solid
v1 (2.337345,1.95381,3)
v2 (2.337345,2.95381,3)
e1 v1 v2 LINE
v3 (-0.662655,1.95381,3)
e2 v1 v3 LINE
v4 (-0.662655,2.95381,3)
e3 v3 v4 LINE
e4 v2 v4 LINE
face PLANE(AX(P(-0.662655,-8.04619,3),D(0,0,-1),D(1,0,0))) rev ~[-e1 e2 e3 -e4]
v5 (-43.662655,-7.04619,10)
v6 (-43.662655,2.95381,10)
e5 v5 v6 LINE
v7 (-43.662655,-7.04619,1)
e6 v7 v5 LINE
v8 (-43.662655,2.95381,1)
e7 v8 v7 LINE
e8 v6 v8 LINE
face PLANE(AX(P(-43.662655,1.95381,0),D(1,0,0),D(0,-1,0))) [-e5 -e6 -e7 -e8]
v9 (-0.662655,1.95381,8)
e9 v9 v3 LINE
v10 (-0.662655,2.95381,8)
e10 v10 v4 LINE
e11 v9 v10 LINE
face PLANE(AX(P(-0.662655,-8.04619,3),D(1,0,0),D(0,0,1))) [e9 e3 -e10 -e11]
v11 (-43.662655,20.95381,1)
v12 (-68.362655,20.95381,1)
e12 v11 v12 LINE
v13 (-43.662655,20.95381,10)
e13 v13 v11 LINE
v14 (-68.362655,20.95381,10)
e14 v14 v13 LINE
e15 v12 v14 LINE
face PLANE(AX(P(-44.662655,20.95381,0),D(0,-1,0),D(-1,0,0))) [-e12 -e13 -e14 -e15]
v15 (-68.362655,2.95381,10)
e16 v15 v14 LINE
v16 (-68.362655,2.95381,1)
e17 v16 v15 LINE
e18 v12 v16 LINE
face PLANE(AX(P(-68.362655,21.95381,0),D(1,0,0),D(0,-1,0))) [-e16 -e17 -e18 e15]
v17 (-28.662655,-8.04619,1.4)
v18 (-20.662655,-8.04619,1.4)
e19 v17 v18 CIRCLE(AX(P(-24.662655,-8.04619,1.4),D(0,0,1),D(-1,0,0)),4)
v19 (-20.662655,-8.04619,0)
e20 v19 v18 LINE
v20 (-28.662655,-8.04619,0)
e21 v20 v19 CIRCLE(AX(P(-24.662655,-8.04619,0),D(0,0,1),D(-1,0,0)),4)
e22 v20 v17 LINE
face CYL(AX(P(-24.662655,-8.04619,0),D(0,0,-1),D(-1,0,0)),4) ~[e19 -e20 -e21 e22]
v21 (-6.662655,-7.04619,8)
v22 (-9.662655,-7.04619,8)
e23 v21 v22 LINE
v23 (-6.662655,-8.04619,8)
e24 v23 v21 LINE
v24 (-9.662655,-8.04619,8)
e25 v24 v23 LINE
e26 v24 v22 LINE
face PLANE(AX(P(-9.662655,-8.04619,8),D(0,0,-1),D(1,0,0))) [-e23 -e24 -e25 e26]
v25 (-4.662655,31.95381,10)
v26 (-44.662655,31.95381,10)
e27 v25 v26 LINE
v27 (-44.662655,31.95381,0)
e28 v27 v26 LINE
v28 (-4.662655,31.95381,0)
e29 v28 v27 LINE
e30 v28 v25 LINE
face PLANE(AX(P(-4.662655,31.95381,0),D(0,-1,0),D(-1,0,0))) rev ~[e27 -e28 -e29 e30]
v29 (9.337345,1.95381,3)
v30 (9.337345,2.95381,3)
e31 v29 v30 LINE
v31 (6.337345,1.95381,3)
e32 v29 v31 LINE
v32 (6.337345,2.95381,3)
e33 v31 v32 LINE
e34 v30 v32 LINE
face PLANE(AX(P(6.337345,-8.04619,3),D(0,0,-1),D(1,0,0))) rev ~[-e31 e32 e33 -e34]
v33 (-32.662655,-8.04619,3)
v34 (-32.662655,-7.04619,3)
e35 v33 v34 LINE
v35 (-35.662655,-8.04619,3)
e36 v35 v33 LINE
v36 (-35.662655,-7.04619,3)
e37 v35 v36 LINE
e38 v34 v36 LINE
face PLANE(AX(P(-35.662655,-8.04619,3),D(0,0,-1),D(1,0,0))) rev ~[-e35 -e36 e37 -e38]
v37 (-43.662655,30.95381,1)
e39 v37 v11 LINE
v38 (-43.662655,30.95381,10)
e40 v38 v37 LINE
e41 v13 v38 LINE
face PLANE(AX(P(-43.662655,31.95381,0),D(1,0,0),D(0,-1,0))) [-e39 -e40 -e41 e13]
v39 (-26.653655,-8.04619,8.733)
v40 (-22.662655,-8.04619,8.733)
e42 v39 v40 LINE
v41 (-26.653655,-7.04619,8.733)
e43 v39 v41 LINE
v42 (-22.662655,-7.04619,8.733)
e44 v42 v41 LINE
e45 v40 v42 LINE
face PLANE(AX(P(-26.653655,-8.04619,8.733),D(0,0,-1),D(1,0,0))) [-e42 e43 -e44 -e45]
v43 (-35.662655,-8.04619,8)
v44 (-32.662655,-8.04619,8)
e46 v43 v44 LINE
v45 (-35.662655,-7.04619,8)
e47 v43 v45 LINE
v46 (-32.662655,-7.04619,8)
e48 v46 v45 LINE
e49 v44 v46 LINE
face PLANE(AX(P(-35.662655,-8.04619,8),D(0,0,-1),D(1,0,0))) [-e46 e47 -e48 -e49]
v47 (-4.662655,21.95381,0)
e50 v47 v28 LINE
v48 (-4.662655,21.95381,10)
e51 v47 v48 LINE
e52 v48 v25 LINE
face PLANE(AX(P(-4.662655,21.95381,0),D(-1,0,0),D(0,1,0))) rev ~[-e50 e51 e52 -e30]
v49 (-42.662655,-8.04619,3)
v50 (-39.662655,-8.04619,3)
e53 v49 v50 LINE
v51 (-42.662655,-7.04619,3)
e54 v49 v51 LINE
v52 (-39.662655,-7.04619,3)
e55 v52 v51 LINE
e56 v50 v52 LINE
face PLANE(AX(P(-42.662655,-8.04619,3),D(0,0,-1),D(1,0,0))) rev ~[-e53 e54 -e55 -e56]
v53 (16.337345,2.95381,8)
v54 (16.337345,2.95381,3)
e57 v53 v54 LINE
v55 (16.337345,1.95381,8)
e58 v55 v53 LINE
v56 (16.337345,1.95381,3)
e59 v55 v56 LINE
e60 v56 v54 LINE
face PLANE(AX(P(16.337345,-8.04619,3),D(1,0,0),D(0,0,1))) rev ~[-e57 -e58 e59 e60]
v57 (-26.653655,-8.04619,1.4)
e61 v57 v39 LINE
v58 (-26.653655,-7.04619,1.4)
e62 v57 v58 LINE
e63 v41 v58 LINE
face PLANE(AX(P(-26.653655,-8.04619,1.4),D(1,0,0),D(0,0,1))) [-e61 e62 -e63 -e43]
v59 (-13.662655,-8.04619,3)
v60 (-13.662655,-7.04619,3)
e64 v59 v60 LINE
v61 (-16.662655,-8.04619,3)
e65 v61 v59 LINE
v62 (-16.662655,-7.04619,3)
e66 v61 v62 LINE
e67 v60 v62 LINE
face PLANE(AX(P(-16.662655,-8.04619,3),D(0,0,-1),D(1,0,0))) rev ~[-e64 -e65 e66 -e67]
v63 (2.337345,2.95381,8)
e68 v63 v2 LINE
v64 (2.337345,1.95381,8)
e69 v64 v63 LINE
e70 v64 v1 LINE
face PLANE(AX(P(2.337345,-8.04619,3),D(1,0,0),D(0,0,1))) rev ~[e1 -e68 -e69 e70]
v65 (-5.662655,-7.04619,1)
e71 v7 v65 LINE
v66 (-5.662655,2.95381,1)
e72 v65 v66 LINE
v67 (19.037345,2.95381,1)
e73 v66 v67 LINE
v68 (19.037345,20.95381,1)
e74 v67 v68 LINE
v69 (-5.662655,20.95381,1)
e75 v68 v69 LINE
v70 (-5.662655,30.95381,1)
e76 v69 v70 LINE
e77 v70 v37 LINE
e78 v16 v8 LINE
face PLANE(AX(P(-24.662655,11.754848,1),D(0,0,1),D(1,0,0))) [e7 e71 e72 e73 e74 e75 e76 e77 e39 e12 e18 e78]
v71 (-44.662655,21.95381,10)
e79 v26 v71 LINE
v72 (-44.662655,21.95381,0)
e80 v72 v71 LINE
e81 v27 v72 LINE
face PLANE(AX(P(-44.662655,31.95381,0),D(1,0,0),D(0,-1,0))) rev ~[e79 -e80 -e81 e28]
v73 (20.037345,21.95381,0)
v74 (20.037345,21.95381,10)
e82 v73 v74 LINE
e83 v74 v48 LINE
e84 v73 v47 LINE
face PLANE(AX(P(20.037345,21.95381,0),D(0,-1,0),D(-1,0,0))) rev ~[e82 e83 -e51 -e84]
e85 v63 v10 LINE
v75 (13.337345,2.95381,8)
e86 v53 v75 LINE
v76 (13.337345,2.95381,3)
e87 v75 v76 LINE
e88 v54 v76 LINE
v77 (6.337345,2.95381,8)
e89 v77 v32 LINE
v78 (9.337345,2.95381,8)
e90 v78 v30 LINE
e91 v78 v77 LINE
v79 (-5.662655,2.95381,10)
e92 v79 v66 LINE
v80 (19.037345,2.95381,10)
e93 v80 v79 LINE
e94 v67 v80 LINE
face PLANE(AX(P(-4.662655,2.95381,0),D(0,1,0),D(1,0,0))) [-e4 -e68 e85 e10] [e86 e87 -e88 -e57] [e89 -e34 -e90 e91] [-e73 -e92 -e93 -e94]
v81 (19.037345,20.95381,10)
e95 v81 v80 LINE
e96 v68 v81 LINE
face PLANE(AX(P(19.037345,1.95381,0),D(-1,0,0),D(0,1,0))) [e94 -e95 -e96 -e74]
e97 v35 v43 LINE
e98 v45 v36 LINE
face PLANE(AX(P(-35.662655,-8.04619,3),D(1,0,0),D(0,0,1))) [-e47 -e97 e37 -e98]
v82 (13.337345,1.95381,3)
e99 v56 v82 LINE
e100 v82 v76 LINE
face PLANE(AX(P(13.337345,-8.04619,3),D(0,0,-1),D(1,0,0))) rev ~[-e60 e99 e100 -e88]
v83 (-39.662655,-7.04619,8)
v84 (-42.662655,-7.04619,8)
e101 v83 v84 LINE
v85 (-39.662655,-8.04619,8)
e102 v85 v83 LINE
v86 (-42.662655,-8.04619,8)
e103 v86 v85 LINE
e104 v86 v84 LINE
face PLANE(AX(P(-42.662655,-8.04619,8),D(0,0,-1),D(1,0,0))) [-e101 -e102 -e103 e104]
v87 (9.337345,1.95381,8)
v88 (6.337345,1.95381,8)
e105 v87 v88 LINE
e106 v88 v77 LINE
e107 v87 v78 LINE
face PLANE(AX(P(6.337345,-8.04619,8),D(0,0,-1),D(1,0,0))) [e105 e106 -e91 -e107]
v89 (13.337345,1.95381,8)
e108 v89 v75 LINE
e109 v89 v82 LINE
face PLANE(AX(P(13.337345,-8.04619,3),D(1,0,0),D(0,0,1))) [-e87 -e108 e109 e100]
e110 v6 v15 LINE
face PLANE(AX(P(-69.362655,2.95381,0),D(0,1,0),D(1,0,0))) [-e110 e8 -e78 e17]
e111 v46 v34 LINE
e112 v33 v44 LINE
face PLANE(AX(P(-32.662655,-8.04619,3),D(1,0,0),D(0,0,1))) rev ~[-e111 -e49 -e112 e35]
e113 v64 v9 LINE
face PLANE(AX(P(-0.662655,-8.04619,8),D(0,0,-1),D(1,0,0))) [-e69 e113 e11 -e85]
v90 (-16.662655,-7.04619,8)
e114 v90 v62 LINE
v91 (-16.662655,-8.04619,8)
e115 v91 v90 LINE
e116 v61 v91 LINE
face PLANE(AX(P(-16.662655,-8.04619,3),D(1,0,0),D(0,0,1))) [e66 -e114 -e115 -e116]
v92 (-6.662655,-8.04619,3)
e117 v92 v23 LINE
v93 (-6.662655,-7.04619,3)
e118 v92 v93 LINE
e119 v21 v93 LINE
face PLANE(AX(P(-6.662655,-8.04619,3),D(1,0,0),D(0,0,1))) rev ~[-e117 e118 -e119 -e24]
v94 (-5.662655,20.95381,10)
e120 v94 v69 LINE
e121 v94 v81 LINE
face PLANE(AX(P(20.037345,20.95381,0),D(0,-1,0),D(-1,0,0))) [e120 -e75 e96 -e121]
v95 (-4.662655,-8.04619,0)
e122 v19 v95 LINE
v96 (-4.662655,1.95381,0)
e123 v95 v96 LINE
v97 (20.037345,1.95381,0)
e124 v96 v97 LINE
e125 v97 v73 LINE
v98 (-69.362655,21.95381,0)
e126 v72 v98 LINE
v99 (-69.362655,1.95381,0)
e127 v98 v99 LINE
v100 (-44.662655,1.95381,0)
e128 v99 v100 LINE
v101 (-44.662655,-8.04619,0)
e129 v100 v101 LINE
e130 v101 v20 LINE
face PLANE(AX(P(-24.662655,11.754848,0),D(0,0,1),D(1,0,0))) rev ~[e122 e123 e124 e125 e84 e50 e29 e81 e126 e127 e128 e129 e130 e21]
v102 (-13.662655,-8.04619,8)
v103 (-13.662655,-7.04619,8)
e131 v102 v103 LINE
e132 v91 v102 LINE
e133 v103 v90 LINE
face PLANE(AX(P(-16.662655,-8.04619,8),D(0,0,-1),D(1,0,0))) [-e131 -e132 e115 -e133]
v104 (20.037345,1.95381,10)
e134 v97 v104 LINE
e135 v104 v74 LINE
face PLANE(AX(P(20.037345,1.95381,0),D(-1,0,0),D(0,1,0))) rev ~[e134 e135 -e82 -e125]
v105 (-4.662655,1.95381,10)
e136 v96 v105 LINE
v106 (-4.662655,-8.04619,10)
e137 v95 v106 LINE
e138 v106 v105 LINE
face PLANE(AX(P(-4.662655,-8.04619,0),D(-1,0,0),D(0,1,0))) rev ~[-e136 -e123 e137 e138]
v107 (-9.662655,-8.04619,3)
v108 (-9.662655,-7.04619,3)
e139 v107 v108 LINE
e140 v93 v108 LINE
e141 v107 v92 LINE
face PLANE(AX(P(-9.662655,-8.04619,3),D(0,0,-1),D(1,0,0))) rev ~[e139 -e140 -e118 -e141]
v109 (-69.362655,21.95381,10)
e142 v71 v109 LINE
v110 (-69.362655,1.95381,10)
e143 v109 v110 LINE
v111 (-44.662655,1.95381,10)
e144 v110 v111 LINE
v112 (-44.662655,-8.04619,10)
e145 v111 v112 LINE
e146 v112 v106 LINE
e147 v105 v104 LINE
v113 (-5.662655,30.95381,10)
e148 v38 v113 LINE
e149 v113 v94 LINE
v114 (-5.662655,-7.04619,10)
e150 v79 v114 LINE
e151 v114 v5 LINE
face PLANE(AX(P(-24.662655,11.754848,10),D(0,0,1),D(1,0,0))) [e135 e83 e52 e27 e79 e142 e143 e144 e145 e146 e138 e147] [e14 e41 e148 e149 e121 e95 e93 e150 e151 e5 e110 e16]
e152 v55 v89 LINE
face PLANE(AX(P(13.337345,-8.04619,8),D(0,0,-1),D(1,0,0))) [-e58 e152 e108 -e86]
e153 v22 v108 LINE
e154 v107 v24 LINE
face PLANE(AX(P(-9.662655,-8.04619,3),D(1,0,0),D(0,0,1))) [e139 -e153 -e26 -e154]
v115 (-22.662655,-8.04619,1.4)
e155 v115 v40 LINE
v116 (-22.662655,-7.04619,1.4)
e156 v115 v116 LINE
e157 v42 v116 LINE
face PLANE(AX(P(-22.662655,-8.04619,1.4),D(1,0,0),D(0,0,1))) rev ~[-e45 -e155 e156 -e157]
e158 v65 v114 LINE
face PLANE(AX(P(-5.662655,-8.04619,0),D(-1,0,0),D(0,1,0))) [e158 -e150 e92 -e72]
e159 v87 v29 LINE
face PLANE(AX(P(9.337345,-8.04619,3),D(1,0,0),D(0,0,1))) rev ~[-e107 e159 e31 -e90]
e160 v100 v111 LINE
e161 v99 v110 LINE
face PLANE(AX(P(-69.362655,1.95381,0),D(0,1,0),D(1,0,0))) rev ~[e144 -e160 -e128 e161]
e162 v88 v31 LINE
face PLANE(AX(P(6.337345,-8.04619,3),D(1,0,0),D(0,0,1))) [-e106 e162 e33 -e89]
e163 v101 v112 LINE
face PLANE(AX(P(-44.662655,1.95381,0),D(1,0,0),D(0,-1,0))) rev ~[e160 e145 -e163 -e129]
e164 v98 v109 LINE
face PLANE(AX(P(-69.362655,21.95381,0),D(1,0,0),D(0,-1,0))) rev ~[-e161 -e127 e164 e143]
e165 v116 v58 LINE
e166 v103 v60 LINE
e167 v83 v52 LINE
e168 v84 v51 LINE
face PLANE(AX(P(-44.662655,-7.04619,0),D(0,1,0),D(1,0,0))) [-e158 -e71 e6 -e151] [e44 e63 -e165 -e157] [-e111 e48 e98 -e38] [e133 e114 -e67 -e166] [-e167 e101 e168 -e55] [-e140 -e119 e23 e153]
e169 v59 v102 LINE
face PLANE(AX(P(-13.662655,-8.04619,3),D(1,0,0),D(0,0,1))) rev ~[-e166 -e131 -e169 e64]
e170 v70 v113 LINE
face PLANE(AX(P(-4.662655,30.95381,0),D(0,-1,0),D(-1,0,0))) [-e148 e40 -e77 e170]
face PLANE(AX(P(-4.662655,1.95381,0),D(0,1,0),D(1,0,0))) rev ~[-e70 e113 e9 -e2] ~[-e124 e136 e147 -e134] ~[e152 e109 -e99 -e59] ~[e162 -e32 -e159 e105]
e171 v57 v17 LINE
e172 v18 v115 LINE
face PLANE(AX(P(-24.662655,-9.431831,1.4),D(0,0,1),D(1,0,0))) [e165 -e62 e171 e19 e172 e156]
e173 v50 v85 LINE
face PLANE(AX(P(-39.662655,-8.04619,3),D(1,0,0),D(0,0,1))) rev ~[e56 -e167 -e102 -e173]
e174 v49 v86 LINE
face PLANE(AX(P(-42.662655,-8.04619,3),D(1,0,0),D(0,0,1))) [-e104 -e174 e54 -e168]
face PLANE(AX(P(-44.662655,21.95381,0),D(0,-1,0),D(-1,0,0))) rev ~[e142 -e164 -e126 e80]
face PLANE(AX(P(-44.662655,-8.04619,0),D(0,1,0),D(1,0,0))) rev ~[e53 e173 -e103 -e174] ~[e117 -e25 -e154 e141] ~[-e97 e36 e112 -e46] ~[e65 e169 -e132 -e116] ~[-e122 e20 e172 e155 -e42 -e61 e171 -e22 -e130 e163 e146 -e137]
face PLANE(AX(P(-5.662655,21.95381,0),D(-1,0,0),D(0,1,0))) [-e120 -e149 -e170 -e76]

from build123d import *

# Parameters (mm, degrees)
F1_DEPTH = 10
F2_T     = -1
F3_DEPTH = 1.4
F4_W     = 3
F4_H     = 5
F4_W_2   = 3.991
F4_H_2   = 7.333
F5_DEPTH = 12


with BuildPart() as f1:
    # F0 (on Top) → F1 (new body)
    with BuildSketch(Plane.XY):
        with BuildLine():
            Line((-44.662655282, 31.9538097456), (-44.662655282, 21.9538097456))
            Line((-44.662655282, 21.9538097456), (-69.362655282, 21.9538097456))
            Line((-69.362655282, 21.9538097456), (-69.362655282, 1.9538097456))
            Line((-69.362655282, 1.9538097456), (-44.662655282, 1.9538097456))
            Line((-44.662655282, 1.9538097456), (-44.662655282, -8.0461902544))
            Line((-44.662655282, -8.0461902544), (-28.662655282, -8.0461902544))
            ThreePointArc((-28.662655282, -8.0461902544), (-24.662655282, -4.0461902544), (-20.662655282, -8.0461902544))
            Line((-20.662655282, -8.0461902544), (-4.662655282, -8.0461902544))
            Line((-4.662655282, -8.0461902544), (-4.662655282, 1.9538097456))
            Line((-4.662655282, 1.9538097456), (20.037344718, 1.9538097456))
            Line((20.037344718, 1.9538097456), (20.037344718, 21.9538097456))
            Line((20.037344718, 21.9538097456), (-4.662655282, 21.9538097456))
            Line((-4.662655282, 21.9538097456), (-4.662655282, 31.9538097456))
            Line((-4.662655282, 31.9538097456), (-44.662655282, 31.9538097456))
        make_face()
        with BuildLine():
            ThreePointArc((-20.662655282, -8.0461902544), (-24.662655282, -4.0461902544), (-28.662655282, -8.0461902544))
            Line((-28.662655282, -8.0461902544), (-20.662655282, -8.0461902544))
        make_face()
    extrude(amount=F1_DEPTH)

    # F2
    f2_openings = [f1.faces().sort_by_distance(p)[0] for p in [
        (-24.662655, 11.95381, 10),
    ]]
    offset(amount=F2_T, openings=f2_openings, kind=Kind.INTERSECTION)

    # F0 (on Top) → F3 (join)
    with BuildSketch(Plane.XY):
        with BuildLine():
            Line((-20.662655282, -8.0461902544), (-28.662655282, -8.0461902544))
            ThreePointArc((-28.662655282, -8.0461902544), (-24.662655282, -12.0461902544), (-20.662655282, -8.0461902544))
        make_face()
    extrude(amount=F3_DEPTH)

    # F4 (on face) → F5 (cut)
    with BuildSketch(Plane.XZ.offset(8.0461902544)):
        with Locations((-41.162655282, 5.5)):
            Rectangle(F4_W, F4_H)
        with Locations((-34.162655282, 5.5)):
            Rectangle(F4_W, F4_H)
        with Locations((-15.162655282, 5.5)):
            Rectangle(F4_W, F4_H)
        with Locations((-8.162655282, 5.5)):
            Rectangle(F4_W, F4_H)
        with Locations((0.837344718, 5.5)):
            Rectangle(F4_W, F4_H)
        with Locations((7.837344718, 5.5)):
            Rectangle(F4_W, F4_H)
        with Locations((14.837344718, 5.5)):
            Rectangle(F4_W, F4_H)
        with Locations((-24.658155282, 5.0665)):
            Rectangle(F4_W_2, F4_H_2)
    extrude(amount=-F5_DEPTH, mode=Mode.SUBTRACT)


solid = f1.part
